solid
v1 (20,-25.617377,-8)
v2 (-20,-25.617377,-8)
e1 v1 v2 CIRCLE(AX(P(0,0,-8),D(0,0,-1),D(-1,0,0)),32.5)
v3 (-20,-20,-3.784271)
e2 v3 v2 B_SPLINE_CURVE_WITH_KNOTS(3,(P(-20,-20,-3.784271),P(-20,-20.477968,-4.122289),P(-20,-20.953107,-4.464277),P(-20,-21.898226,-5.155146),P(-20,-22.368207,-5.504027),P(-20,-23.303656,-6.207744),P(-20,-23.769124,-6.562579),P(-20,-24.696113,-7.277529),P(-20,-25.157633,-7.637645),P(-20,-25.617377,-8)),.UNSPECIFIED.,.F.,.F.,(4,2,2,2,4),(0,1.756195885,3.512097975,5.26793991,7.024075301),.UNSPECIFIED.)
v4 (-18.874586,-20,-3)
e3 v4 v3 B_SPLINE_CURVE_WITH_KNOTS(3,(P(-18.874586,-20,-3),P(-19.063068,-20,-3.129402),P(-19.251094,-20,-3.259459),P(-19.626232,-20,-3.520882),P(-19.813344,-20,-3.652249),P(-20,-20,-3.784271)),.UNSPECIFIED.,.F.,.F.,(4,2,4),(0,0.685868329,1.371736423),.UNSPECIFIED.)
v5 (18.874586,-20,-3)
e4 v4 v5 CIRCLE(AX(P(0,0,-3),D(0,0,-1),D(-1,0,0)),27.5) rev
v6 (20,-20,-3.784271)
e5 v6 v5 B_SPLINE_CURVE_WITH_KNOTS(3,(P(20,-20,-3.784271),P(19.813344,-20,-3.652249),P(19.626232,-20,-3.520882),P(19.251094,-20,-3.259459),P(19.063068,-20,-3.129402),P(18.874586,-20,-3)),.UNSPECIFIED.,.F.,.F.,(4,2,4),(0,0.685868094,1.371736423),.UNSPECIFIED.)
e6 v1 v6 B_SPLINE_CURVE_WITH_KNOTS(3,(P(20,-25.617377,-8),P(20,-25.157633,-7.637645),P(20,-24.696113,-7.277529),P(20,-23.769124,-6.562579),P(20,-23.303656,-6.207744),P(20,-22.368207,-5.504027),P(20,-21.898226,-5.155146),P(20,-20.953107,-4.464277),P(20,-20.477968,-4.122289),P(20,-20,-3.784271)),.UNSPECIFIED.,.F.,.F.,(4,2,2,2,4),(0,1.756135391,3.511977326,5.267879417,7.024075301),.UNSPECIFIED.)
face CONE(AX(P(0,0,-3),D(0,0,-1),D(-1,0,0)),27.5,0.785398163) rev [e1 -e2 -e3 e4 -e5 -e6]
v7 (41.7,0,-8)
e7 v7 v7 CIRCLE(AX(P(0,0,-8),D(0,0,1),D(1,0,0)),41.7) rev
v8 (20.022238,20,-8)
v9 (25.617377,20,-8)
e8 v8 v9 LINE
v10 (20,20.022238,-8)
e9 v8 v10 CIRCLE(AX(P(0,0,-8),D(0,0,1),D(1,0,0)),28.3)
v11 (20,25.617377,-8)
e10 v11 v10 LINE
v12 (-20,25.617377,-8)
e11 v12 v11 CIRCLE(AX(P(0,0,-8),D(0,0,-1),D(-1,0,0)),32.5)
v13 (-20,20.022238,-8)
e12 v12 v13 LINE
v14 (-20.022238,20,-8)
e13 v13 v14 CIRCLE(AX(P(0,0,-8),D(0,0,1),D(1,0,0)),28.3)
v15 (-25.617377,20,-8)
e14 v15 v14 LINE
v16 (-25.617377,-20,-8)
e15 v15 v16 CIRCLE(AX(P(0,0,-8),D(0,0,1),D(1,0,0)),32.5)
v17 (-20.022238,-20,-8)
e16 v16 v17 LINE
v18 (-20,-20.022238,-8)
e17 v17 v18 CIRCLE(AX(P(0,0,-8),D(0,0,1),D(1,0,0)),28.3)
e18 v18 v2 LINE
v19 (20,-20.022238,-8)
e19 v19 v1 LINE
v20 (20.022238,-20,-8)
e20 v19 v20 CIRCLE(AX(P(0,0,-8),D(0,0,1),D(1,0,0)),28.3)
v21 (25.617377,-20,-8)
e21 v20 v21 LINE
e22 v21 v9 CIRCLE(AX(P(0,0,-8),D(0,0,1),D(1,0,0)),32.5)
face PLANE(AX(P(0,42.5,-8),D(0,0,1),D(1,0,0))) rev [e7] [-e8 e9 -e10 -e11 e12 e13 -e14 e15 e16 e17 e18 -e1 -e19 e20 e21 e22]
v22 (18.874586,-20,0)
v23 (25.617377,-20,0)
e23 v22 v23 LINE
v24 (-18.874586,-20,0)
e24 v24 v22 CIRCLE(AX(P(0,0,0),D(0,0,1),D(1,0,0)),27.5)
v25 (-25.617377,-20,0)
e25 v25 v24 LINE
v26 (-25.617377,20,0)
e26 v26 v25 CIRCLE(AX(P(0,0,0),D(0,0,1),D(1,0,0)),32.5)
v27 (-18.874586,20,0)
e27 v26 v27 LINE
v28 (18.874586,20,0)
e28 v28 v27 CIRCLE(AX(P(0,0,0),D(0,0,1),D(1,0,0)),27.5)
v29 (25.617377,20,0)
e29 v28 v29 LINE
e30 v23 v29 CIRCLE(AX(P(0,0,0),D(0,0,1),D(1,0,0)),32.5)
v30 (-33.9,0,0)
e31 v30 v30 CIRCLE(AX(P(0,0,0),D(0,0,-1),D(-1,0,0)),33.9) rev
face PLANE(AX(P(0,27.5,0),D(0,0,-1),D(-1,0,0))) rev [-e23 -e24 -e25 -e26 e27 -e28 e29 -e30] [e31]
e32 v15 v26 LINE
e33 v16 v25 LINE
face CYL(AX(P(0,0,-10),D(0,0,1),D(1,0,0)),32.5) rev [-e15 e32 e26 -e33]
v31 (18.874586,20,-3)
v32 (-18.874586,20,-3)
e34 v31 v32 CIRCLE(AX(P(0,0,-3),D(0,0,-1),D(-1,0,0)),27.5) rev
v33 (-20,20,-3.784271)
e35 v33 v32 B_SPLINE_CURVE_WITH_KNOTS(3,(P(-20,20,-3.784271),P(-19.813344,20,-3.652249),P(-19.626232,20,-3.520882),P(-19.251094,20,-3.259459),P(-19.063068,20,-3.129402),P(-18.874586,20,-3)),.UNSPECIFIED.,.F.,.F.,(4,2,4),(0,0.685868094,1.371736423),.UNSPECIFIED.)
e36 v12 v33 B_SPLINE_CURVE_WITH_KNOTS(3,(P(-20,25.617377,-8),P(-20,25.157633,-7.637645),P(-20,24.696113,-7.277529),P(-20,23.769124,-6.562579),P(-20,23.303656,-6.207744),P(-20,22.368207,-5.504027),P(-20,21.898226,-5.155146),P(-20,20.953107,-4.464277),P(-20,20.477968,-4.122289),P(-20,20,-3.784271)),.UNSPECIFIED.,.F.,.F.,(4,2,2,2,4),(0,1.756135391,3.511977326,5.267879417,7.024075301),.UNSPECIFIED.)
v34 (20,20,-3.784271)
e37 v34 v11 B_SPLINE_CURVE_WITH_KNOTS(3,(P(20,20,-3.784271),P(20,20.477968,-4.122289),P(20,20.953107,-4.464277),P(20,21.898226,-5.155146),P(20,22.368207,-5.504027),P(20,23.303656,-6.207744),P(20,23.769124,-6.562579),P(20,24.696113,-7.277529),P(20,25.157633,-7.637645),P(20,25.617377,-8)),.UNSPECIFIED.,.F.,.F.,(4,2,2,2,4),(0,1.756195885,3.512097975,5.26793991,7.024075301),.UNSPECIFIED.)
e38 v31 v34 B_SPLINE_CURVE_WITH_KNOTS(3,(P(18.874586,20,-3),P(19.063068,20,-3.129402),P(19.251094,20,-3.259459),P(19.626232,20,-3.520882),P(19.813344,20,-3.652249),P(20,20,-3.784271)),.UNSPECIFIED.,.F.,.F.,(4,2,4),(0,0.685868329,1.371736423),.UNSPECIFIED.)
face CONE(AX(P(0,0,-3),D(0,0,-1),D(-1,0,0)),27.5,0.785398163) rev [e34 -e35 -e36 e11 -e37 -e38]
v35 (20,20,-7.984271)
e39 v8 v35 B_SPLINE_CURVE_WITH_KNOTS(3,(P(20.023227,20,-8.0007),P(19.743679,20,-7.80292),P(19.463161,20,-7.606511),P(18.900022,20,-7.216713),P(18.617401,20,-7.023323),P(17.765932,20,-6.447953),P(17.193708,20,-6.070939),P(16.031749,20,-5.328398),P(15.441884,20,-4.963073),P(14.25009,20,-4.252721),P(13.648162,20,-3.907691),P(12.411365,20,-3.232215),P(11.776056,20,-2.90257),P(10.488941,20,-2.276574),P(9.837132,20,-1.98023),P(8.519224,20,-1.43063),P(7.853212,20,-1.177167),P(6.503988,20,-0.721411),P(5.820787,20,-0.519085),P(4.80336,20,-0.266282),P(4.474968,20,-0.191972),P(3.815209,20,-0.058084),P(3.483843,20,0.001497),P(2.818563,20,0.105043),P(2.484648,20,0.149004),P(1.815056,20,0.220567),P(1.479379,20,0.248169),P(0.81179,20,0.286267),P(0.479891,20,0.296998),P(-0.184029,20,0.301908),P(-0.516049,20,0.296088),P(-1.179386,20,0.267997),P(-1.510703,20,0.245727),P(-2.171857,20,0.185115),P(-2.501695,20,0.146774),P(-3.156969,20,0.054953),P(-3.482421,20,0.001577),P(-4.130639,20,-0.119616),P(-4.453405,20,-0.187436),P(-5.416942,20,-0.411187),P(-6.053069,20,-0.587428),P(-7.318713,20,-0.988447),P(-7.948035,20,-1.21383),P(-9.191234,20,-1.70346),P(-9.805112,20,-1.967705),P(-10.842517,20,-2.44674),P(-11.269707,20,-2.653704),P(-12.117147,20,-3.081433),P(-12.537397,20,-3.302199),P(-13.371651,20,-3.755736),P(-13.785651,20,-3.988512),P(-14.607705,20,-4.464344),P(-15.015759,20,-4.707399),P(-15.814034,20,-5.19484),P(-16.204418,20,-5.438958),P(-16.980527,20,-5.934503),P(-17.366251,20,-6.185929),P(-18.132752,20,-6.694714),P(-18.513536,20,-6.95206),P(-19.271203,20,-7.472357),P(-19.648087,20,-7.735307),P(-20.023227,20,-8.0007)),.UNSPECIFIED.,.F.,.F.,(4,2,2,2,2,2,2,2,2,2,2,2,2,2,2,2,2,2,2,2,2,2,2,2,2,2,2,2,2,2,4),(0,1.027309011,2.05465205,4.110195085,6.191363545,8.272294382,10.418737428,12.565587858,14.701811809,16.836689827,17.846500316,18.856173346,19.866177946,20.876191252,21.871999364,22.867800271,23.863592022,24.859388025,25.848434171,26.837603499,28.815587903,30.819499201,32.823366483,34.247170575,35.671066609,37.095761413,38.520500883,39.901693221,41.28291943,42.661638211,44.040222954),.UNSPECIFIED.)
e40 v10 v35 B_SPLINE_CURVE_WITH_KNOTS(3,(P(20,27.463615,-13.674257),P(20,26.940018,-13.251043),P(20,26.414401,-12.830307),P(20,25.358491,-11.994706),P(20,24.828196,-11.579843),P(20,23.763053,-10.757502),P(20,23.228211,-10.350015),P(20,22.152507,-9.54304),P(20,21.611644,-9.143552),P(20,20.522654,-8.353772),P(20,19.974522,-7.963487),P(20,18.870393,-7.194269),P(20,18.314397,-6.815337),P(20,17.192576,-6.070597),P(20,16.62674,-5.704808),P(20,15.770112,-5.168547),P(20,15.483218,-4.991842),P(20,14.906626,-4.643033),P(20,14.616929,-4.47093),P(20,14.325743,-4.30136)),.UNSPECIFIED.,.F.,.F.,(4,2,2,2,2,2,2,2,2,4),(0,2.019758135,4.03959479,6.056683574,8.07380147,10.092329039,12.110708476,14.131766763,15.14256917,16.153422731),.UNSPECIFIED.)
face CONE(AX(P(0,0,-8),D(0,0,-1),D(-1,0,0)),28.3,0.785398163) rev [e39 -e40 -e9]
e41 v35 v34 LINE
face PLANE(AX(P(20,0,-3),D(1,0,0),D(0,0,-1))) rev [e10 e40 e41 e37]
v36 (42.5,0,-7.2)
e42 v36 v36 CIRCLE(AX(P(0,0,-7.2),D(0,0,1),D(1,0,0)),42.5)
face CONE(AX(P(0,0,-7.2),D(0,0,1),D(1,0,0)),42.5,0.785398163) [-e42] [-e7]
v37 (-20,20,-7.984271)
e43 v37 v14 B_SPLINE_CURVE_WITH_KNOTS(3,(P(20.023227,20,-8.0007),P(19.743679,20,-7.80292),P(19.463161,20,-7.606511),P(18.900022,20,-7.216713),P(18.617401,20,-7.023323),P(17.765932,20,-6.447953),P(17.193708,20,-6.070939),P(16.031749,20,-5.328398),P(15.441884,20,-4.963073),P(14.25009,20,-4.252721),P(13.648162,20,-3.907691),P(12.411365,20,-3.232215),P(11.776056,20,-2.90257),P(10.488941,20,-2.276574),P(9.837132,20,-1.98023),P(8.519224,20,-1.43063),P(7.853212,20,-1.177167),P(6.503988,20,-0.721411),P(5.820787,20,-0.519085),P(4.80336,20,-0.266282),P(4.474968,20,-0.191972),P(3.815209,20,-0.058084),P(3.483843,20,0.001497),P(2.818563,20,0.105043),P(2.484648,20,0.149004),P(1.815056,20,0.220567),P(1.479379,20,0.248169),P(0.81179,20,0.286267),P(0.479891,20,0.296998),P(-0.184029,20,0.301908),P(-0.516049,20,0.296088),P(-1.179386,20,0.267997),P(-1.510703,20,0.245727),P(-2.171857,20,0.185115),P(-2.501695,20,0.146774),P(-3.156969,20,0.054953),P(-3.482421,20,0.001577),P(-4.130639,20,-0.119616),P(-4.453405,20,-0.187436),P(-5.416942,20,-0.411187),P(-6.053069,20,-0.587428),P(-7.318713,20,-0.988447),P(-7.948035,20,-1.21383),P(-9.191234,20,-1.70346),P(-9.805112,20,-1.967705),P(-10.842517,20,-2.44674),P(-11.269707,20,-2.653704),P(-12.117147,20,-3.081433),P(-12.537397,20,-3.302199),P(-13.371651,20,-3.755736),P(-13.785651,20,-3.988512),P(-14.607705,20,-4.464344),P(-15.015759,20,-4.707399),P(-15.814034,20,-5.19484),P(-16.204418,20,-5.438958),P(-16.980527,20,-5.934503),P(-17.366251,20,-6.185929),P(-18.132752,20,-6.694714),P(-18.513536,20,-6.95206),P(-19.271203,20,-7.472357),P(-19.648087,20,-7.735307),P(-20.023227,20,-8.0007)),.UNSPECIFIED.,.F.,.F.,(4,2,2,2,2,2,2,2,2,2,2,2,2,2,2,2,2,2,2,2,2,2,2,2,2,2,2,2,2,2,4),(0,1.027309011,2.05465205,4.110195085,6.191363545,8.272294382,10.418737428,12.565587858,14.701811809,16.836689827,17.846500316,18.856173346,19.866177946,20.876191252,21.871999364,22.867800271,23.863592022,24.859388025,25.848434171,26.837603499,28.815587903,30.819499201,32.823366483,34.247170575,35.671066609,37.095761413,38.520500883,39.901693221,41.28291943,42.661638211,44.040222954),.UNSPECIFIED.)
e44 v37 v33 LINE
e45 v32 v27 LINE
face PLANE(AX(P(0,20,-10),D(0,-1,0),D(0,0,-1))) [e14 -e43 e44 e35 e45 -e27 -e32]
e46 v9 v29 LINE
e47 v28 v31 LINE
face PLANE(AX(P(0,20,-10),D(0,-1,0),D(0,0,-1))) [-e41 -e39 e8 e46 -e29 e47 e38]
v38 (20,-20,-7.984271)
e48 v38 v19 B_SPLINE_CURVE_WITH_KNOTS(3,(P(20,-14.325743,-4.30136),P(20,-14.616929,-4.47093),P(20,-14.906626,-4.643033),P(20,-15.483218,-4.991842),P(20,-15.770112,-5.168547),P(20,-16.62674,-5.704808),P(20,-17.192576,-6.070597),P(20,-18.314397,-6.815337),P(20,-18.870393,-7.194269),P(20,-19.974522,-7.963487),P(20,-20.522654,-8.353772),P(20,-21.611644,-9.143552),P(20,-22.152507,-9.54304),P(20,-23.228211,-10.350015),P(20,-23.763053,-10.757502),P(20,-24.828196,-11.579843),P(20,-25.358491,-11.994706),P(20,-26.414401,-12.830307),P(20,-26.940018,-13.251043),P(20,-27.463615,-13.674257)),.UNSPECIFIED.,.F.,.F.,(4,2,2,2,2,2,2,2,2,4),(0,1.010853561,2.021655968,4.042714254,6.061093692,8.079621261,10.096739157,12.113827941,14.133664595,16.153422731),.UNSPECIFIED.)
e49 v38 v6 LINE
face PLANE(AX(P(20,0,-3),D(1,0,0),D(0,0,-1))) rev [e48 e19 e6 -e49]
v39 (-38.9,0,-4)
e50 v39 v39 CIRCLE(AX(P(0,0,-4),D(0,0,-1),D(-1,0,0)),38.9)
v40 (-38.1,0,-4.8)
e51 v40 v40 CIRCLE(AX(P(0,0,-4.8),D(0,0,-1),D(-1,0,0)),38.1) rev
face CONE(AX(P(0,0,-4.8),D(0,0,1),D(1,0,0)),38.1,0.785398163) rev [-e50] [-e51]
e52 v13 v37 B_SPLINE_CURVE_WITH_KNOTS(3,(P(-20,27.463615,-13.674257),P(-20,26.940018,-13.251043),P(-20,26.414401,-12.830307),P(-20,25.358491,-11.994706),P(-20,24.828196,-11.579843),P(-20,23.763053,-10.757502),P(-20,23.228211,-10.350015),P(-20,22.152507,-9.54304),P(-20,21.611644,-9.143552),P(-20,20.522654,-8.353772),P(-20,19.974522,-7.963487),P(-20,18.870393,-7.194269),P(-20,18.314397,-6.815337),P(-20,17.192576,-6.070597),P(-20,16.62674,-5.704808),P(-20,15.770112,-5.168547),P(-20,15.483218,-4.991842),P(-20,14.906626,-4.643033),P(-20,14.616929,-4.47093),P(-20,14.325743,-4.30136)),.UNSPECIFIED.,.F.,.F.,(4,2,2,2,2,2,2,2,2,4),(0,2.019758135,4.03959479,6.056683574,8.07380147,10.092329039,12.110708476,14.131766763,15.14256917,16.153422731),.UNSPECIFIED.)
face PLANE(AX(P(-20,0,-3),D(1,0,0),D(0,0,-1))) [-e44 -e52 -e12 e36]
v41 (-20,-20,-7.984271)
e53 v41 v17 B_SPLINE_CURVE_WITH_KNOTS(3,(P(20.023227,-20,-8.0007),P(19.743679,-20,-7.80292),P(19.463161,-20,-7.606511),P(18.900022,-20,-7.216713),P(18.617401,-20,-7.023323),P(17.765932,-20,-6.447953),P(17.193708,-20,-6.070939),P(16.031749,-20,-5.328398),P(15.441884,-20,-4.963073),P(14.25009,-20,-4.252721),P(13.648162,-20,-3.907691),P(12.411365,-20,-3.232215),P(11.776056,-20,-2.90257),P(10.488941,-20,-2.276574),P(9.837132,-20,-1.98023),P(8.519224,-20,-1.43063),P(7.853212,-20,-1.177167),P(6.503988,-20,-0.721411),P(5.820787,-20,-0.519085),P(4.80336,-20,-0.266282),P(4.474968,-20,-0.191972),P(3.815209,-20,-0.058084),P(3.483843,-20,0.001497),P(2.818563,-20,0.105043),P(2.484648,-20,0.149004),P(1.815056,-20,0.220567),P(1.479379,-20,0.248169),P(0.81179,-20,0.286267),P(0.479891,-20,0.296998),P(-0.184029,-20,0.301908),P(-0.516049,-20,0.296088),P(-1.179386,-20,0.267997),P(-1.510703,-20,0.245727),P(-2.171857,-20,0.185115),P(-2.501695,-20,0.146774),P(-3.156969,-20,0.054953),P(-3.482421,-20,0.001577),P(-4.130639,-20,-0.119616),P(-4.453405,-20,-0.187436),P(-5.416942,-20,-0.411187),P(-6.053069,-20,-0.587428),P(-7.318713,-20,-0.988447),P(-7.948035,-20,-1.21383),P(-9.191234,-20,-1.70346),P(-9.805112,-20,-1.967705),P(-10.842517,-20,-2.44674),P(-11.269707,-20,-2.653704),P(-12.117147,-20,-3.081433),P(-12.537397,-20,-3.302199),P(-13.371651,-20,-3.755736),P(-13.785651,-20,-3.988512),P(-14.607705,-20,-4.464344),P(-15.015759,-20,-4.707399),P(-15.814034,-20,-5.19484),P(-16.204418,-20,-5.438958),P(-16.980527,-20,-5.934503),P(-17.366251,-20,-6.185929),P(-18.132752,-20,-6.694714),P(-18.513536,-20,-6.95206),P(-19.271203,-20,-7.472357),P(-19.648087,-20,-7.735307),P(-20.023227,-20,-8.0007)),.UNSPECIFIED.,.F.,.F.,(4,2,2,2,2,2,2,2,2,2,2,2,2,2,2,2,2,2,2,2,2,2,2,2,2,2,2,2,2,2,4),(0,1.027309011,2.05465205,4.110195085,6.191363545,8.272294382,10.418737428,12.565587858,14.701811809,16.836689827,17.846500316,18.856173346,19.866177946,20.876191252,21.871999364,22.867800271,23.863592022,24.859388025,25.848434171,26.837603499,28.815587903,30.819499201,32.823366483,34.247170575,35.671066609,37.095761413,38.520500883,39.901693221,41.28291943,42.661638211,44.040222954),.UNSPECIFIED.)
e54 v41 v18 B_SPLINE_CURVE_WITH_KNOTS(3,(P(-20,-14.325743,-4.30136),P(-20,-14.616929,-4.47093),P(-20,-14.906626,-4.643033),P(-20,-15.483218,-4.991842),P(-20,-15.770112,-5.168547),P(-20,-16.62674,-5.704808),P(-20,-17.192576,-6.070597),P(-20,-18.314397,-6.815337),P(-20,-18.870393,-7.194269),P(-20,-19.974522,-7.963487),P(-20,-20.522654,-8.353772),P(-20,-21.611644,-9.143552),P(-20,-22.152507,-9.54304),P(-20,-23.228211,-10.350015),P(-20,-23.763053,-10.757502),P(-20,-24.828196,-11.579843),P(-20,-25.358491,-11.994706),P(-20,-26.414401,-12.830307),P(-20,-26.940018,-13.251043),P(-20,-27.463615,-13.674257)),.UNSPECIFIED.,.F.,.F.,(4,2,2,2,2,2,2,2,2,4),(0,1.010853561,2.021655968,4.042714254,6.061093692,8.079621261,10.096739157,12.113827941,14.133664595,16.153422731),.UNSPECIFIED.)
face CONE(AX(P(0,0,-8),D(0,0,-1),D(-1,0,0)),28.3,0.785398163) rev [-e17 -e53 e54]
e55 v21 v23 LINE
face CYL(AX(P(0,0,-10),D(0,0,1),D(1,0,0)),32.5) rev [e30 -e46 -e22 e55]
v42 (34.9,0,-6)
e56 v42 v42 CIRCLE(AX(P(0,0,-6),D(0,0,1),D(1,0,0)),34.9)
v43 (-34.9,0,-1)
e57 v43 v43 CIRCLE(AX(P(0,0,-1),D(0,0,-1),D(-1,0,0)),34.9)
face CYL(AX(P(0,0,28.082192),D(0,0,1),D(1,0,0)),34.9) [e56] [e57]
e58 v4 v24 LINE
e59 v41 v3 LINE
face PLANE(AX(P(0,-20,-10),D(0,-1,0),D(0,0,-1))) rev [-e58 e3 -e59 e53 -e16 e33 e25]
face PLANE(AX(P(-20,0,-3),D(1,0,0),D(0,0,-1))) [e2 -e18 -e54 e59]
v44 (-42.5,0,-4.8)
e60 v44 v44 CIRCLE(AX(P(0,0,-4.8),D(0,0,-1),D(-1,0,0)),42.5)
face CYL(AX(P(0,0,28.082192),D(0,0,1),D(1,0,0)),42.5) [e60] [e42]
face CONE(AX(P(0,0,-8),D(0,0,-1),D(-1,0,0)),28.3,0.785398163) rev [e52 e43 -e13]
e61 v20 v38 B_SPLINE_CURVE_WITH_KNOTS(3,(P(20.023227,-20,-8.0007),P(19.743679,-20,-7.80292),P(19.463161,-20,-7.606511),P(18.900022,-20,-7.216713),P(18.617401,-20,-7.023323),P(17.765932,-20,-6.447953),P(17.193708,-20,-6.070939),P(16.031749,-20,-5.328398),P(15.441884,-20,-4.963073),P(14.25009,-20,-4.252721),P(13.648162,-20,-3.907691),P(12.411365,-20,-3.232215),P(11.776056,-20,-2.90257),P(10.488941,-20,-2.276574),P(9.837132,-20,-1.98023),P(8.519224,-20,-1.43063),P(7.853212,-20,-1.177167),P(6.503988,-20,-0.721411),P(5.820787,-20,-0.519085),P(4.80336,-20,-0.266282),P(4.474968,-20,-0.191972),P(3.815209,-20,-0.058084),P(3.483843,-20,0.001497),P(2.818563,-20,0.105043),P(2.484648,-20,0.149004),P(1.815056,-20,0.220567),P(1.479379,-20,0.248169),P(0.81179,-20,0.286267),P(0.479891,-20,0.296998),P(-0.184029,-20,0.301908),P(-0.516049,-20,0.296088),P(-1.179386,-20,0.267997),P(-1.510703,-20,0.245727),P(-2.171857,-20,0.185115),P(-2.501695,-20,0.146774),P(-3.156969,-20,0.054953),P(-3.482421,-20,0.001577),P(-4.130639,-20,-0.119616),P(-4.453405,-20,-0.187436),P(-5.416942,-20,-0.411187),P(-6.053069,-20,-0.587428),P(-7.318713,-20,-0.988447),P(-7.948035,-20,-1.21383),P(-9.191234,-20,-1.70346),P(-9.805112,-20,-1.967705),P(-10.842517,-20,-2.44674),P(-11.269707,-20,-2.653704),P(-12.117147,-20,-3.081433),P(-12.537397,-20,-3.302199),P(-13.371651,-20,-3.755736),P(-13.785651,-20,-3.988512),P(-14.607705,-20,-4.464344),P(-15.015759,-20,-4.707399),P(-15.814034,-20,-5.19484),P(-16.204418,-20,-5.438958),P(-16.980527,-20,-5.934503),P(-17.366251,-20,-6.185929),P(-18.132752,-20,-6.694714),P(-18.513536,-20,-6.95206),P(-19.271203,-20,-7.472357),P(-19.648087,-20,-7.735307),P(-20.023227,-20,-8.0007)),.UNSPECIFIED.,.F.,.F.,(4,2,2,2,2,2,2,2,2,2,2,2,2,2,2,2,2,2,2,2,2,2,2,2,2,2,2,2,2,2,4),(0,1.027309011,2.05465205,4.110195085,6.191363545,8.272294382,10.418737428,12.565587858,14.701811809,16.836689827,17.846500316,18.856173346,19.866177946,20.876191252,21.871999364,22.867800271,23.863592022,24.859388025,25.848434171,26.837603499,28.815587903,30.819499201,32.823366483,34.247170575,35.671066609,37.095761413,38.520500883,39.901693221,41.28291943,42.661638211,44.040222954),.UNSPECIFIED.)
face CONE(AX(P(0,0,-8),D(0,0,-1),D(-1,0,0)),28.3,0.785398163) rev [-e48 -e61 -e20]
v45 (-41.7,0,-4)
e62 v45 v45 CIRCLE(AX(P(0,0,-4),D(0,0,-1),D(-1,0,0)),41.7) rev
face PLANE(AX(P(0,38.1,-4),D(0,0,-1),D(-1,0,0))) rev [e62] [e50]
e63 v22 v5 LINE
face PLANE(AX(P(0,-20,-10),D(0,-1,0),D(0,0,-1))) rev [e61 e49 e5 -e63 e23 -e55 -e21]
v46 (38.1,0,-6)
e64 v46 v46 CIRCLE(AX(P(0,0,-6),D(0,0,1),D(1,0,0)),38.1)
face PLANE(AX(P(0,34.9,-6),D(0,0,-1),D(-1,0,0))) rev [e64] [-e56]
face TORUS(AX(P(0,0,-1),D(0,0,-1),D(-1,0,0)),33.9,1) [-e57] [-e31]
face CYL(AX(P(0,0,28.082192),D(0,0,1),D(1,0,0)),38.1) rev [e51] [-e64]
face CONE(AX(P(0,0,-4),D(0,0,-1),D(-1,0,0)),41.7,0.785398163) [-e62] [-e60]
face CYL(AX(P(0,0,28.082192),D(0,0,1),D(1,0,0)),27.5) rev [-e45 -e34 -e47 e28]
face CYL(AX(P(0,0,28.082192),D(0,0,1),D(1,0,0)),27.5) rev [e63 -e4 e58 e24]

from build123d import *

# Parameters (mm, degrees)
FASE1_SIZE                      = 0.8
SCHNITT_LINEAR_AUSTRAGEN1_DEPTH = 10
SCHNITT_LINEAR_START            = -5
SCHNITT_LINEAR_AUSTRAGEN2_DEPTH = 5
FASE2_SIZE                      = 5
VERRUNDUNG1_R                   = 1


# Read off the part's stored shape, not the designer's step: Schnitt-Linear austragen2
with BuildPart() as part:
    # Skizze3 → Rotation1 (revolve)
    with BuildSketch(Plane(origin=(0, 0, 0), x_dir=(0, 0, -1), z_dir=(1, 0, 0)), mode=Mode.PRIVATE) as rotation1_sk:
        Polygon((0, 27.5), (0, 34.9), (6, 34.9), (6, 38.1), (4, 38.1), (4, 42.5), (8, 42.5), (8, 27.5), align=None)
    revolve(rotation1_sk.sketch.rotate(Axis((0, 0, 28.082191781), (0, 0, -1)), 90), axis=Axis((0, 0, 28.082191781), (0, 0, -1)))

    # Fase1
    fase1_edges = [part.edges().sort_by_distance(p)[0] for p in [
        (-27.5, 0, -8),
        (-42.5, 0, -8),
        (-42.5, 0, -4),
        (-38.1, 0, -4),
    ]]
    chamfer(fase1_edges, length=FASE1_SIZE)

    # Skizze4 → Schnitt-Linear austragen1 (cut)
    with BuildSketch(Plane.XY):
        with BuildLine():
            Line((25.617376915, 20), (-25.617376915, 20))
            ThreePointArc((-25.617376915, 20), (-30.731211738, 10.575567367), (-32.5, 0))
            Line((-32.5, 0), (32.5, 0))
            ThreePointArc((32.5, 0), (30.731211738, 10.575567367), (25.617376915, 20))
        make_face()
        with BuildLine():
            Line((32.5, 0), (-32.5, 0))
            ThreePointArc((-32.5, 0), (-30.731211738, -10.575567367), (-25.617376915, -20))
            Line((-25.617376915, -20), (25.617376915, -20))
            ThreePointArc((25.617376915, -20), (30.731211738, -10.575567367), (32.5, 0))
        make_face()
    extrude(amount=-SCHNITT_LINEAR_AUSTRAGEN1_DEPTH, mode=Mode.SUBTRACT)

    # Schnitt-Linear austragen2 outline → Schnitt-Linear austragen2 (cut)
    with BuildSketch(Plane(origin=(0, 0, -8), x_dir=(-1, 0, 0), z_dir=(0, 0, -1)).offset(SCHNITT_LINEAR_START)):
        with BuildLine():
            Line((-20, -20), (-20, -25.617376915))
            ThreePointArc((-20, -25.617376915), (0, -32.5), (20, -25.617376915))
            Line((20, -25.617376915), (20, -20))
            Line((20, -20), (18.874586088, -20))
            ThreePointArc((18.874586088, -20), (0, -27.5), (-18.874586088, -20))
            Line((-18.874586088, -20), (-20, -20))
        make_face()
        with BuildLine():
            Line((20, 20), (20, 25.617376915))
            ThreePointArc((20, 25.617376915), (0, 32.5), (-20, 25.617376915))
            Line((-20, 25.617376915), (-20, 20))
            Line((-20, 20), (-18.874586088, 20))
            ThreePointArc((-18.874586088, 20), (0, 27.5), (18.874586088, 20))
            Line((18.874586088, 20), (20, 20))
        make_face()
    extrude(amount=SCHNITT_LINEAR_AUSTRAGEN2_DEPTH, mode=Mode.SUBTRACT)

    # Fase2
    fase2_edges = [part.edges().sort_by_distance(p)[0] for p in [
        (0, -32.5, -3),
        (0, 32.5, -3),
    ]]
    chamfer(fase2_edges, length=FASE2_SIZE - 0.0001)  # a hair under: the kernel refuses the full size

    # Verrundung1
    verrundung1_edges = [part.edges().sort_by_distance(p)[0] for p in [
        (-34.9, 0, 0),
    ]]
    fillet(verrundung1_edges, radius=VERRUNDUNG1_R)


solid = part.part
